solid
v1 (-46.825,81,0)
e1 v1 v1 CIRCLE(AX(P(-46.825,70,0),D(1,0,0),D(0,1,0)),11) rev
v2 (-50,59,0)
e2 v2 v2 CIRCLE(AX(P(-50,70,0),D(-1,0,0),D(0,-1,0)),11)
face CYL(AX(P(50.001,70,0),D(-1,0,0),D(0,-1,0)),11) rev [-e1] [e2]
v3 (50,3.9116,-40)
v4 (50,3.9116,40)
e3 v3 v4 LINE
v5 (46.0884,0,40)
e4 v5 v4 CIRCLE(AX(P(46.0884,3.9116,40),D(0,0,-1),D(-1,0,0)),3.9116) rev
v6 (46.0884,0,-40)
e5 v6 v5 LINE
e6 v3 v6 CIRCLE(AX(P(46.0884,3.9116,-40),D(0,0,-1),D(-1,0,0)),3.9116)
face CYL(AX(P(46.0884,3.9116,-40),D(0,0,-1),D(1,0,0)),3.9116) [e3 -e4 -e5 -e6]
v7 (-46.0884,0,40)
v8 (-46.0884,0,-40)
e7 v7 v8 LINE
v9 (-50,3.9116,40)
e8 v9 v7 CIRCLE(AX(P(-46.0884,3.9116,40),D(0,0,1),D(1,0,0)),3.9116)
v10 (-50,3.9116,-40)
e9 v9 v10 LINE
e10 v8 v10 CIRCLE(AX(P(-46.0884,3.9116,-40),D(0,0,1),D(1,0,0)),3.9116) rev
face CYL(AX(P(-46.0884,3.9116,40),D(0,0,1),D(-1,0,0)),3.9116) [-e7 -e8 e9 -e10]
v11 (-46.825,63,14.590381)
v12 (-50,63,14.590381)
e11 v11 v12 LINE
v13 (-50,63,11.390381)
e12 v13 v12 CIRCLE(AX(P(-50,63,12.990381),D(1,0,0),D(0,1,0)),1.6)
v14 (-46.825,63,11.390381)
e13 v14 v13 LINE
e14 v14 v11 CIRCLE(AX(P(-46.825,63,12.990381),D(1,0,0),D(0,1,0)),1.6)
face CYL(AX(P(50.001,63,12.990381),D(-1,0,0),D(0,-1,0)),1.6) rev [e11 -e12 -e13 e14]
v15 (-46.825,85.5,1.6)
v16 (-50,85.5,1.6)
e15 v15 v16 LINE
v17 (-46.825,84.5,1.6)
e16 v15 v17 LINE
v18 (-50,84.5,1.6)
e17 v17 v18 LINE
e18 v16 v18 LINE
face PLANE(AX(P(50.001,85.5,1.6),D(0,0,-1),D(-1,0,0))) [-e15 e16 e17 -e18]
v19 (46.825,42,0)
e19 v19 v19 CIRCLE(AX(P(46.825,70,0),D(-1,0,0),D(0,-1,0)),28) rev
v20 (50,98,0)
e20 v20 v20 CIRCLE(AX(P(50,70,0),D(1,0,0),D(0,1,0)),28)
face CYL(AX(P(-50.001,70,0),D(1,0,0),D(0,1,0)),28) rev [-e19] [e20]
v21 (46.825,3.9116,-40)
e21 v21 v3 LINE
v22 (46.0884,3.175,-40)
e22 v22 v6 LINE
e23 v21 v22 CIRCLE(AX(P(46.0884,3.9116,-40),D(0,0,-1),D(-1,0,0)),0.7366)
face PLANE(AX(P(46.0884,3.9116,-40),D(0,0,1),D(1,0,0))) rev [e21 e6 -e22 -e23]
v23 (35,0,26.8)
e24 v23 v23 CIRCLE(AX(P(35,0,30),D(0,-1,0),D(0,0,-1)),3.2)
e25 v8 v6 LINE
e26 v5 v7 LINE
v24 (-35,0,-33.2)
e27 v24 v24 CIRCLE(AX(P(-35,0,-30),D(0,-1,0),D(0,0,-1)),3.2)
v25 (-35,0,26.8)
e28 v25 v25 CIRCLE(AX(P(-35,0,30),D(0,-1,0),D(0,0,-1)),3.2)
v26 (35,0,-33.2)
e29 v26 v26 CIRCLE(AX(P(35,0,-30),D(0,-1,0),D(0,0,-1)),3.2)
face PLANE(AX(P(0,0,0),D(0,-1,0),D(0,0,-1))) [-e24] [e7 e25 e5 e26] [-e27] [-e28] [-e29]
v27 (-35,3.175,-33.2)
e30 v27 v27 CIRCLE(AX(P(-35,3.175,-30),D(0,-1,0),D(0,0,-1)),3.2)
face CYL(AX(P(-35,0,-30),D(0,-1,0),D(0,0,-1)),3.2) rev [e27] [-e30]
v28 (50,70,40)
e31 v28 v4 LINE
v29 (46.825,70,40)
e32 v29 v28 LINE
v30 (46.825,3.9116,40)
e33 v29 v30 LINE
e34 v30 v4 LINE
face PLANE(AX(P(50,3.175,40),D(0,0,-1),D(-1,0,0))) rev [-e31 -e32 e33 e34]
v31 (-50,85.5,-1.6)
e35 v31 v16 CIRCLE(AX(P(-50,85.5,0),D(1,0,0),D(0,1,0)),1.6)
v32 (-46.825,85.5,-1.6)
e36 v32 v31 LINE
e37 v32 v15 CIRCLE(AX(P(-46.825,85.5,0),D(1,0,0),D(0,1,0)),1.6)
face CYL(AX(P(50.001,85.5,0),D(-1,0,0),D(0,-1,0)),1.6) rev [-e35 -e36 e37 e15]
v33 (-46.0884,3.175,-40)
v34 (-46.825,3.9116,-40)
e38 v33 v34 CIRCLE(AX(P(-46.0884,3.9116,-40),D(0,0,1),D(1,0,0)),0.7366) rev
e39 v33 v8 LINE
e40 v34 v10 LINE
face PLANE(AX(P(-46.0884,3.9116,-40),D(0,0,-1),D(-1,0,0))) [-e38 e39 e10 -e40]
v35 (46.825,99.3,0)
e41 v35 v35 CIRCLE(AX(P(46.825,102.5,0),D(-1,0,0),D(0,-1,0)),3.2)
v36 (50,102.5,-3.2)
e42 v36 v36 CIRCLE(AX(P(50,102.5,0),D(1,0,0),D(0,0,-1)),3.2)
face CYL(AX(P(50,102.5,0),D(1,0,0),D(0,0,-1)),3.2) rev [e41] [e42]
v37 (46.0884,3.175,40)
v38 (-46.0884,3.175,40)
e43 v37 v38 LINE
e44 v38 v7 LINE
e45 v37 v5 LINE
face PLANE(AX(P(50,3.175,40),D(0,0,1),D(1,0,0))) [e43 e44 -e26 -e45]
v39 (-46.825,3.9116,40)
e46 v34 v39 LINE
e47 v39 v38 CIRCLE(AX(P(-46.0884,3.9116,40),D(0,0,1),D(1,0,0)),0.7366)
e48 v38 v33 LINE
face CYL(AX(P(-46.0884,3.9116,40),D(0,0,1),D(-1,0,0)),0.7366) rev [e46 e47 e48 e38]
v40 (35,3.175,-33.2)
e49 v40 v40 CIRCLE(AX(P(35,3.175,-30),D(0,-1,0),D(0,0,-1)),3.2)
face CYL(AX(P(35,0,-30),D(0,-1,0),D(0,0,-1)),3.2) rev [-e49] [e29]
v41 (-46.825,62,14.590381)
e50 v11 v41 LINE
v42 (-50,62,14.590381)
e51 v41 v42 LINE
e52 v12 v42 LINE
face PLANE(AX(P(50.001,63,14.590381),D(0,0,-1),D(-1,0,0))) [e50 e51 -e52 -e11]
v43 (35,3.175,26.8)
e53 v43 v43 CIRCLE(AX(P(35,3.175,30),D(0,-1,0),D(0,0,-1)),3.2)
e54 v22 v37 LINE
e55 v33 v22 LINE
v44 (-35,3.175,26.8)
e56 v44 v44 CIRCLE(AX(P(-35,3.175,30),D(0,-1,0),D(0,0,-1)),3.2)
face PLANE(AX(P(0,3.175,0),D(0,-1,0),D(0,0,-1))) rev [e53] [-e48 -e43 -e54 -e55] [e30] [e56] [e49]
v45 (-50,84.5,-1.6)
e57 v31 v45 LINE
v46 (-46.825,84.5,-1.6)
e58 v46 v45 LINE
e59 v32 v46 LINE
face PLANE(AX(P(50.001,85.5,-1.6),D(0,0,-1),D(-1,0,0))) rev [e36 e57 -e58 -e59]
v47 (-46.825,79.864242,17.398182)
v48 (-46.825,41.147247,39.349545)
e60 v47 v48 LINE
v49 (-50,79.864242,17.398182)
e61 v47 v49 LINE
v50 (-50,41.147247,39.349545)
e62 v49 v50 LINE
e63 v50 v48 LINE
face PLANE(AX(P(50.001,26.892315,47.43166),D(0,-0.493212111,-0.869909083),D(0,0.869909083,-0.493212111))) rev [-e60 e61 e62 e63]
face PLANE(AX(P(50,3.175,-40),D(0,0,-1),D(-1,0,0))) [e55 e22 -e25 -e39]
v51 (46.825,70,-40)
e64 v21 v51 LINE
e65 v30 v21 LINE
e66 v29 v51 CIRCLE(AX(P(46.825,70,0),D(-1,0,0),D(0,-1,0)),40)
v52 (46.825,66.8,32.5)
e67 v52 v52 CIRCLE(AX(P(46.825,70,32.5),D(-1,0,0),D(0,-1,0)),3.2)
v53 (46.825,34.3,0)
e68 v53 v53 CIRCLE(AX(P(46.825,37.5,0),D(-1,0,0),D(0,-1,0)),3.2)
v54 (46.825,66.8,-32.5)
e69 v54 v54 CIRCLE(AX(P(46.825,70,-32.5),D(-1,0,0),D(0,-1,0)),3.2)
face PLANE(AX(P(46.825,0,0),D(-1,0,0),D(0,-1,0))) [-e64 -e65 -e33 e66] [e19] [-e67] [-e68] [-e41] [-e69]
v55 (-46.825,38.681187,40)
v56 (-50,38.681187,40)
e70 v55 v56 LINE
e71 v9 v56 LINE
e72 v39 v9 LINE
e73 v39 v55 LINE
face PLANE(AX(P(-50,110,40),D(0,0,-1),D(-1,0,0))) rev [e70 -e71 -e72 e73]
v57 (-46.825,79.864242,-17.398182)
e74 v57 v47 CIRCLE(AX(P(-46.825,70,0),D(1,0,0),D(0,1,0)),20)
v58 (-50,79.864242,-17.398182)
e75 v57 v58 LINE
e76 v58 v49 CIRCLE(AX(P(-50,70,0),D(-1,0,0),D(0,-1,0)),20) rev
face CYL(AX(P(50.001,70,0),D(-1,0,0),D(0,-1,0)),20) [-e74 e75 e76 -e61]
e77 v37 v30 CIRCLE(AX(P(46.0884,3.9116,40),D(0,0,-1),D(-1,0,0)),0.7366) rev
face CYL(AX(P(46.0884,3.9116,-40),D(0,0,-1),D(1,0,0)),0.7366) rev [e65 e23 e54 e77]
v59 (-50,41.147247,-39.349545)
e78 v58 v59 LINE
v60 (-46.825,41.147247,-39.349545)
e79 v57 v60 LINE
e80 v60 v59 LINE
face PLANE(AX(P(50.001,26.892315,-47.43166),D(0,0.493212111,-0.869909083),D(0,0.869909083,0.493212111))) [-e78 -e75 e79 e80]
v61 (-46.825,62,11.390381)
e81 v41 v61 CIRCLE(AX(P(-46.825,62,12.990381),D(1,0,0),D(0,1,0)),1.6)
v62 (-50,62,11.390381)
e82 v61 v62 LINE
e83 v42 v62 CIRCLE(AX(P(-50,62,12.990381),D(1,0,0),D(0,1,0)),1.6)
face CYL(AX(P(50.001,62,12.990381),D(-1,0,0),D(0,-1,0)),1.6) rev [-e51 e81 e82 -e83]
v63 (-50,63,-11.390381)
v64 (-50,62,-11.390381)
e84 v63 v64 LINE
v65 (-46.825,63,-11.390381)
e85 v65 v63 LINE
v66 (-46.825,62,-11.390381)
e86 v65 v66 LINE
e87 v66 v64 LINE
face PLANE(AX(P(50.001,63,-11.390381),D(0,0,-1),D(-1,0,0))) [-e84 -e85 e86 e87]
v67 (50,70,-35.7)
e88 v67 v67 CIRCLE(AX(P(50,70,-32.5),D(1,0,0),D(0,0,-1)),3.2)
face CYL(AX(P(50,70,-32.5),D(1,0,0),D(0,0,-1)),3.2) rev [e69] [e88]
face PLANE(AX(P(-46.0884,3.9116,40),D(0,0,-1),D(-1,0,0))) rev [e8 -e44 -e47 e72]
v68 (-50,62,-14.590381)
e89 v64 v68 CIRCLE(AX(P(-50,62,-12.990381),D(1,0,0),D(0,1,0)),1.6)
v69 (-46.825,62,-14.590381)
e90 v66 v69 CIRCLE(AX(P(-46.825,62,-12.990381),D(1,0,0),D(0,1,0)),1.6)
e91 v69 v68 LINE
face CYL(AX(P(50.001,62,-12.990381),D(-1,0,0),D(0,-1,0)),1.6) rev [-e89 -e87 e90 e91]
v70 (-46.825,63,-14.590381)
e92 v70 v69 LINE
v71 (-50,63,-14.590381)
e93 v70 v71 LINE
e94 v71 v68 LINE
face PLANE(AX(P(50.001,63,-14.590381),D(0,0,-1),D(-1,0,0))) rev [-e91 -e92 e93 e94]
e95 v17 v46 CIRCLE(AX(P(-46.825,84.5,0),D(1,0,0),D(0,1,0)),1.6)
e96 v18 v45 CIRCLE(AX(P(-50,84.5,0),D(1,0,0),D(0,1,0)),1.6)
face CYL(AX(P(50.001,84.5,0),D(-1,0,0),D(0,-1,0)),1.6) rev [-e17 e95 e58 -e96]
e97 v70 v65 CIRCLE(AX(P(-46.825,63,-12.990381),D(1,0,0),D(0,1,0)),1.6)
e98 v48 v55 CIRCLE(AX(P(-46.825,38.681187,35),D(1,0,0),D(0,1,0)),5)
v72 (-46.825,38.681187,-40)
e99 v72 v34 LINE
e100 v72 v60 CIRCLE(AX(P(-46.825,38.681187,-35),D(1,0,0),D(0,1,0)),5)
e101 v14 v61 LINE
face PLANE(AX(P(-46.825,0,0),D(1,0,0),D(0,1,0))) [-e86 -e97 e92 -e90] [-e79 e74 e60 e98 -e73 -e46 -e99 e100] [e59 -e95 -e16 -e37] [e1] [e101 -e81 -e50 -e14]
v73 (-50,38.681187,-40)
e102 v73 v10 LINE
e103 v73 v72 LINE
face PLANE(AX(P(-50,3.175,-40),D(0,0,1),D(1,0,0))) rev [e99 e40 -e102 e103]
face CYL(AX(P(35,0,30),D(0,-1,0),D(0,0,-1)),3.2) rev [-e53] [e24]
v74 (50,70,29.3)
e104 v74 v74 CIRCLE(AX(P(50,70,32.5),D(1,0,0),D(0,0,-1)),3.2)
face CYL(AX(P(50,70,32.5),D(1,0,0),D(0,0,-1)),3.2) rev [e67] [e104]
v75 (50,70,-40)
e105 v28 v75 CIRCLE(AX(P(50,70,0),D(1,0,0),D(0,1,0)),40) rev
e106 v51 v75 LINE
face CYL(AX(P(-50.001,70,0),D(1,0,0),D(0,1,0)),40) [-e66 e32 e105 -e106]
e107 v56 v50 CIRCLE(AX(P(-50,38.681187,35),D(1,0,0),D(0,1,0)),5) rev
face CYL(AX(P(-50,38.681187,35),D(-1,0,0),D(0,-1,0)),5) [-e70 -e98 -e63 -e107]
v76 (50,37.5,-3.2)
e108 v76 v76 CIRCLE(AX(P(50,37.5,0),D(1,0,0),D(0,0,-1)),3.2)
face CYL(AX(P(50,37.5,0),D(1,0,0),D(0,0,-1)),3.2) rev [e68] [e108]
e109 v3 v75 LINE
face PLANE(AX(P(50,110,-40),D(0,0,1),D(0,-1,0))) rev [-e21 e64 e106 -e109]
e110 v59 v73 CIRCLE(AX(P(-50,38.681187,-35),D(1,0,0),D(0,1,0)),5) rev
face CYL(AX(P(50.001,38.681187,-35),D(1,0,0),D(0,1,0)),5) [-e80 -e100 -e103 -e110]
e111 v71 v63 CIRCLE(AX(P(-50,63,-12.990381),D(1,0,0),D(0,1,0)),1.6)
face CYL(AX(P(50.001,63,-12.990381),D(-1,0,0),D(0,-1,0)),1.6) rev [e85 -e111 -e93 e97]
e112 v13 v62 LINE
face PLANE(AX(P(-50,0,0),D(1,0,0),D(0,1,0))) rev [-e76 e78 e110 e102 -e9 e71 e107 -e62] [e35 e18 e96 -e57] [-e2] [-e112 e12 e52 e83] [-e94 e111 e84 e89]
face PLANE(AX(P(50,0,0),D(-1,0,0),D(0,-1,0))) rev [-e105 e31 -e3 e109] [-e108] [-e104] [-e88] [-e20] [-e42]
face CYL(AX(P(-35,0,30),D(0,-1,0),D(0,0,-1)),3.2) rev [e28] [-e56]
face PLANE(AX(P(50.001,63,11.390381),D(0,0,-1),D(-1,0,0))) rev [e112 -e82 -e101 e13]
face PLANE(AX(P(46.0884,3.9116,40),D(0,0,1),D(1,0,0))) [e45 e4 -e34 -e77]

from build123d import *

# Parameters (mm, degrees)
SKETCH1_W                      = 80
SKETCH1_H                      = 100
BASE_FLANGE1_DEPTH             = 3.175
EDGE_FLANGE2_STRIP_W           = 14.1732
EDGE_FLANGE2_STRIP_H           = 3.175
EDGE_FLANGE2_STRIP_CUT_DEPTH   = 80
EDGE_FLANGE2_STRIP_2_W         = 14.1732
EDGE_FLANGE2_STRIP_2_H         = 3.175
EDGE_FLANGE2_STRIP_CUT_2_DEPTH = 80
EDGE_FLANGE2_DEPTH             = 80
EDGE_FLANGE2_BEND_DEPTH        = 80
CUT_EXTRUDE1_REACH             = 155.948
SKETCH12_R                     = 28
M6_CLEARANCE_HOLE1_D           = 6.4
M6_CLEARANCE_HOLE1_DEPTH       = 3.175
M6_CLEARANCE_HOLE2_D           = 6.4
CUT_EXTRUDE2_REACH             = 155.948
SKETCH19_R                     = 11
FILLET1_R                      = 5


# Sheet-metal steps are written as plain solids
with BuildPart() as part:
    # Sketch1 → Base-Flange1 (new body)
    with BuildSketch(Plane(origin=(0, 0, 0), x_dir=(0, 0, -1), z_dir=(0, -1, 0))):
        Rectangle(SKETCH1_W, SKETCH1_H)
    extrude(amount=-BASE_FLANGE1_DEPTH)

    # Edge-Flange2 strip (across the edge) → Edge-Flange2 strip cut (cut)
    with BuildSketch(Plane(origin=(50, 3.175, 40), x_dir=(-1, 0, 0), z_dir=(0, 0, -1))):
        with Locations((-3.175, -1.5875)):
            Rectangle(EDGE_FLANGE2_STRIP_W, EDGE_FLANGE2_STRIP_H)
    extrude(amount=EDGE_FLANGE2_STRIP_CUT_DEPTH, mode=Mode.SUBTRACT)

    # Edge-Flange2 strip 2 (across the edge) → Edge-Flange2 strip cut 2 (cut)
    with BuildSketch(Plane(origin=(-50, 3.175, -40), x_dir=(1, 0, 0), z_dir=(0, 0, 1))):
        with Locations((-3.175, -1.5875)):
            Rectangle(EDGE_FLANGE2_STRIP_2_W, EDGE_FLANGE2_STRIP_2_H)
    extrude(amount=EDGE_FLANGE2_STRIP_CUT_2_DEPTH, mode=Mode.SUBTRACT)

    # Edge-Flange2 section (across the edge) → Edge-Flange2 (add)
    with BuildSketch(Plane(origin=(50, 3.175, 40), x_dir=(-1, 0, 0), z_dir=(0, 0, -1))):
        with BuildLine():
            Line((0, 0.7366), (0, 106.825))
            Line((0, 106.825), (3.175, 106.825))
            Line((3.175, 106.825), (3.175, 0.7366))
            ThreePointArc((3.175, 0.7366), (3.390745145, 0.215745145), (3.9116, 0))
            Line((3.9116, 0), (3.9116, -3.175))
            ThreePointArc((3.9116, -3.175), (1.145681115, -2.029318885), (0, 0.7366))
        make_face()
    extrude(amount=EDGE_FLANGE2_DEPTH)

    # Edge-Flange2 section 2 (across the edge) → Edge-Flange2 bend (add)
    with BuildSketch(Plane(origin=(-50, 3.175, -40), x_dir=(1, 0, 0), z_dir=(0, 0, 1))):
        with BuildLine():
            Line((0, 0.7366), (0, 106.825))
            Line((0, 106.825), (3.175, 106.825))
            Line((3.175, 106.825), (3.175, 0.7366))
            ThreePointArc((3.175, 0.7366), (3.390745145, 0.215745145), (3.9116, 0))
            Line((3.9116, 0), (3.9116, -3.175))
            ThreePointArc((3.9116, -3.175), (1.145681115, -2.029318885), (0, 0.7366))
        make_face()
    extrude(amount=EDGE_FLANGE2_BEND_DEPTH)

    # Sketch12 → Cut-Extrude1 (cut, up to next)
    with BuildSketch(Plane(origin=(50, 0, 0), x_dir=(0, 0, -1), z_dir=(1, 0, 0)), mode=Mode.PRIVATE) as cut_extrude1_sk1:
        with BuildLine():
            Line((-40, 110), (-40, 70))
            ThreePointArc((-40, 70), (-28.284271269, 98.284271226), (-6.1e-08, 110))
            Line((-6.1e-08, 110), (-40, 110))
        make_face()
    cut_extrude1_tool1 = extrude(cut_extrude1_sk1.sketch, amount=-CUT_EXTRUDE1_REACH, mode=Mode.PRIVATE) & part.part
    # Sketch12 → Cut-Extrude1 (cut, up to next)
    with BuildSketch(Plane(origin=(50, 0, 0), x_dir=(0, 0, -1), z_dir=(1, 0, 0)), mode=Mode.PRIVATE) as cut_extrude1_sk2:
        with BuildLine():
            Line((40, 110), (-6.1e-08, 110))
            ThreePointArc((-6.1e-08, 110), (28.284271226, 98.284271269), (40, 70))
            Line((40, 70), (40, 110))
        make_face()
    cut_extrude1_tool2 = extrude(cut_extrude1_sk2.sketch, amount=-CUT_EXTRUDE1_REACH, mode=Mode.PRIVATE) & part.part
    # Sketch12 → Cut-Extrude1 (cut, up to next)
    with BuildSketch(Plane(origin=(50, 0, 0), x_dir=(0, 0, -1), z_dir=(1, 0, 0)), mode=Mode.PRIVATE) as cut_extrude1_sk3:
        with Locations(Location((0, 70, 0), (0, 0, 90))):
            Circle(SKETCH12_R)
    cut_extrude1_tool3 = extrude(cut_extrude1_sk3.sketch, amount=-CUT_EXTRUDE1_REACH, mode=Mode.PRIVATE) & part.part
    add(cut_extrude1_tool1.solids().sort_by_distance((50, 101.065282, 31.065282))[0], mode=Mode.SUBTRACT)
    add(cut_extrude1_tool2.solids().sort_by_distance((50, 101.065282, -31.065282))[0], mode=Mode.SUBTRACT)
    add(cut_extrude1_tool3.solids().sort_by_distance((50, 70, 0))[0], mode=Mode.SUBTRACT)

    # M6 Clearance Hole1
    with Locations(Plane(origin=(50, 70, 32.5), x_dir=(0, 1, 0), z_dir=(1, 0, 0))):
        with Locations((0, 0), (-32.5, -32.5), (0, -65), (32.5, -32.5)):
            Hole(M6_CLEARANCE_HOLE1_D / 2, depth=M6_CLEARANCE_HOLE1_DEPTH)

    # M6 Clearance Hole2 (through all)
    with Locations(Plane(origin=(-35, 0, 30), x_dir=(0, 0, -1), z_dir=(0, -1, 0))):
        with Locations((0, 0), (0, 70), (60, 0), (60, 70)):
            Hole(M6_CLEARANCE_HOLE2_D / 2)

    # Sketch19 → Cut-Extrude2 (cut, up to next)
    with BuildSketch(Plane.ZY.offset(50), mode=Mode.PRIVATE) as cut_extrude2_sk1:
        with BuildLine():
            Line((-40, 40), (-17.398181668, 79.864242224))
            ThreePointArc((-17.398181668, 79.864242224), (0, 90), (17.398181668, 79.864242224))
            Line((17.398181668, 79.864242224), (40, 40))
            Line((40, 40), (40, 110))
            Line((40, 110), (-40, 110))
            Line((-40, 110), (-40, 40))
        make_face()
    cut_extrude2_tool1 = extrude(cut_extrude2_sk1.sketch, amount=-CUT_EXTRUDE2_REACH, mode=Mode.PRIVATE) & part.part
    # Sketch19 → Cut-Extrude2 (cut, up to next)
    with BuildSketch(Plane.ZY.offset(50), mode=Mode.PRIVATE) as cut_extrude2_sk2:
        with Locations(Location((0, 70, 0), (0, 0, 270))):
            Circle(SKETCH19_R)
    cut_extrude2_tool2 = extrude(cut_extrude2_sk2.sketch, amount=-CUT_EXTRUDE2_REACH, mode=Mode.PRIVATE) & part.part
    # Sketch19 → Cut-Extrude2 (cut, up to next)
    with BuildSketch(Plane.ZY.offset(50), mode=Mode.PRIVATE) as cut_extrude2_sk3:
        with BuildLine():
            ThreePointArc((-11.390381057, 62), (-12.990381057, 60.4), (-14.590381057, 62))
            Line((-14.590381057, 62), (-14.590381057, 63))
            ThreePointArc((-14.590381057, 63), (-12.990381057, 64.6), (-11.390381057, 63))
            Line((-11.390381057, 63), (-11.390381057, 62))
        make_face()
    cut_extrude2_tool3 = extrude(cut_extrude2_sk3.sketch, amount=-CUT_EXTRUDE2_REACH, mode=Mode.PRIVATE) & part.part
    # Sketch19 → Cut-Extrude2 (cut, up to next)
    with BuildSketch(Plane.ZY.offset(50), mode=Mode.PRIVATE) as cut_extrude2_sk4:
        with BuildLine():
            ThreePointArc((14.590381057, 62), (12.990381057, 60.4), (11.390381057, 62))
            Line((11.390381057, 62), (11.390381057, 63))
            ThreePointArc((11.390381057, 63), (12.990381057, 64.6), (14.590381057, 63))
            Line((14.590381057, 63), (14.590381057, 62))
        make_face()
    cut_extrude2_tool4 = extrude(cut_extrude2_sk4.sketch, amount=-CUT_EXTRUDE2_REACH, mode=Mode.PRIVATE) & part.part
    # Sketch19 → Cut-Extrude2 (cut, up to next)
    with BuildSketch(Plane.ZY.offset(50), mode=Mode.PRIVATE) as cut_extrude2_sk5:
        with BuildLine():
            ThreePointArc((1.6, 84.5), (0, 82.9), (-1.6, 84.5))
            Line((-1.6, 84.5), (-1.6, 85.5))
            ThreePointArc((-1.6, 85.5), (0, 87.1), (1.6, 85.5))
            Line((1.6, 85.5), (1.6, 84.5))
        make_face()
    cut_extrude2_tool5 = extrude(cut_extrude2_sk5.sketch, amount=-CUT_EXTRUDE2_REACH, mode=Mode.PRIVATE) & part.part
    add(cut_extrude2_tool1.solids().sort_by_distance((-50, 60.456413, -29.623817))[0], mode=Mode.SUBTRACT)
    add(cut_extrude2_tool2.solids().sort_by_distance((-50, 70, 0))[0], mode=Mode.SUBTRACT)
    add(cut_extrude2_tool3.solids().sort_by_distance((-50, 62.5, -12.990381))[0], mode=Mode.SUBTRACT)
    add(cut_extrude2_tool4.solids().sort_by_distance((-50, 62.5, 12.990381))[0], mode=Mode.SUBTRACT)
    add(cut_extrude2_tool5.solids().sort_by_distance((-50, 85, 0))[0], mode=Mode.SUBTRACT)

    # Fillet1
    fillet1_edges = [part.edges().sort_by_distance(p)[0] for p in [
        (-48.4125, 40, 40),
        (-48.4125, 40, -40),
    ]]
    fillet(fillet1_edges, radius=FILLET1_R)


solid = part.part
